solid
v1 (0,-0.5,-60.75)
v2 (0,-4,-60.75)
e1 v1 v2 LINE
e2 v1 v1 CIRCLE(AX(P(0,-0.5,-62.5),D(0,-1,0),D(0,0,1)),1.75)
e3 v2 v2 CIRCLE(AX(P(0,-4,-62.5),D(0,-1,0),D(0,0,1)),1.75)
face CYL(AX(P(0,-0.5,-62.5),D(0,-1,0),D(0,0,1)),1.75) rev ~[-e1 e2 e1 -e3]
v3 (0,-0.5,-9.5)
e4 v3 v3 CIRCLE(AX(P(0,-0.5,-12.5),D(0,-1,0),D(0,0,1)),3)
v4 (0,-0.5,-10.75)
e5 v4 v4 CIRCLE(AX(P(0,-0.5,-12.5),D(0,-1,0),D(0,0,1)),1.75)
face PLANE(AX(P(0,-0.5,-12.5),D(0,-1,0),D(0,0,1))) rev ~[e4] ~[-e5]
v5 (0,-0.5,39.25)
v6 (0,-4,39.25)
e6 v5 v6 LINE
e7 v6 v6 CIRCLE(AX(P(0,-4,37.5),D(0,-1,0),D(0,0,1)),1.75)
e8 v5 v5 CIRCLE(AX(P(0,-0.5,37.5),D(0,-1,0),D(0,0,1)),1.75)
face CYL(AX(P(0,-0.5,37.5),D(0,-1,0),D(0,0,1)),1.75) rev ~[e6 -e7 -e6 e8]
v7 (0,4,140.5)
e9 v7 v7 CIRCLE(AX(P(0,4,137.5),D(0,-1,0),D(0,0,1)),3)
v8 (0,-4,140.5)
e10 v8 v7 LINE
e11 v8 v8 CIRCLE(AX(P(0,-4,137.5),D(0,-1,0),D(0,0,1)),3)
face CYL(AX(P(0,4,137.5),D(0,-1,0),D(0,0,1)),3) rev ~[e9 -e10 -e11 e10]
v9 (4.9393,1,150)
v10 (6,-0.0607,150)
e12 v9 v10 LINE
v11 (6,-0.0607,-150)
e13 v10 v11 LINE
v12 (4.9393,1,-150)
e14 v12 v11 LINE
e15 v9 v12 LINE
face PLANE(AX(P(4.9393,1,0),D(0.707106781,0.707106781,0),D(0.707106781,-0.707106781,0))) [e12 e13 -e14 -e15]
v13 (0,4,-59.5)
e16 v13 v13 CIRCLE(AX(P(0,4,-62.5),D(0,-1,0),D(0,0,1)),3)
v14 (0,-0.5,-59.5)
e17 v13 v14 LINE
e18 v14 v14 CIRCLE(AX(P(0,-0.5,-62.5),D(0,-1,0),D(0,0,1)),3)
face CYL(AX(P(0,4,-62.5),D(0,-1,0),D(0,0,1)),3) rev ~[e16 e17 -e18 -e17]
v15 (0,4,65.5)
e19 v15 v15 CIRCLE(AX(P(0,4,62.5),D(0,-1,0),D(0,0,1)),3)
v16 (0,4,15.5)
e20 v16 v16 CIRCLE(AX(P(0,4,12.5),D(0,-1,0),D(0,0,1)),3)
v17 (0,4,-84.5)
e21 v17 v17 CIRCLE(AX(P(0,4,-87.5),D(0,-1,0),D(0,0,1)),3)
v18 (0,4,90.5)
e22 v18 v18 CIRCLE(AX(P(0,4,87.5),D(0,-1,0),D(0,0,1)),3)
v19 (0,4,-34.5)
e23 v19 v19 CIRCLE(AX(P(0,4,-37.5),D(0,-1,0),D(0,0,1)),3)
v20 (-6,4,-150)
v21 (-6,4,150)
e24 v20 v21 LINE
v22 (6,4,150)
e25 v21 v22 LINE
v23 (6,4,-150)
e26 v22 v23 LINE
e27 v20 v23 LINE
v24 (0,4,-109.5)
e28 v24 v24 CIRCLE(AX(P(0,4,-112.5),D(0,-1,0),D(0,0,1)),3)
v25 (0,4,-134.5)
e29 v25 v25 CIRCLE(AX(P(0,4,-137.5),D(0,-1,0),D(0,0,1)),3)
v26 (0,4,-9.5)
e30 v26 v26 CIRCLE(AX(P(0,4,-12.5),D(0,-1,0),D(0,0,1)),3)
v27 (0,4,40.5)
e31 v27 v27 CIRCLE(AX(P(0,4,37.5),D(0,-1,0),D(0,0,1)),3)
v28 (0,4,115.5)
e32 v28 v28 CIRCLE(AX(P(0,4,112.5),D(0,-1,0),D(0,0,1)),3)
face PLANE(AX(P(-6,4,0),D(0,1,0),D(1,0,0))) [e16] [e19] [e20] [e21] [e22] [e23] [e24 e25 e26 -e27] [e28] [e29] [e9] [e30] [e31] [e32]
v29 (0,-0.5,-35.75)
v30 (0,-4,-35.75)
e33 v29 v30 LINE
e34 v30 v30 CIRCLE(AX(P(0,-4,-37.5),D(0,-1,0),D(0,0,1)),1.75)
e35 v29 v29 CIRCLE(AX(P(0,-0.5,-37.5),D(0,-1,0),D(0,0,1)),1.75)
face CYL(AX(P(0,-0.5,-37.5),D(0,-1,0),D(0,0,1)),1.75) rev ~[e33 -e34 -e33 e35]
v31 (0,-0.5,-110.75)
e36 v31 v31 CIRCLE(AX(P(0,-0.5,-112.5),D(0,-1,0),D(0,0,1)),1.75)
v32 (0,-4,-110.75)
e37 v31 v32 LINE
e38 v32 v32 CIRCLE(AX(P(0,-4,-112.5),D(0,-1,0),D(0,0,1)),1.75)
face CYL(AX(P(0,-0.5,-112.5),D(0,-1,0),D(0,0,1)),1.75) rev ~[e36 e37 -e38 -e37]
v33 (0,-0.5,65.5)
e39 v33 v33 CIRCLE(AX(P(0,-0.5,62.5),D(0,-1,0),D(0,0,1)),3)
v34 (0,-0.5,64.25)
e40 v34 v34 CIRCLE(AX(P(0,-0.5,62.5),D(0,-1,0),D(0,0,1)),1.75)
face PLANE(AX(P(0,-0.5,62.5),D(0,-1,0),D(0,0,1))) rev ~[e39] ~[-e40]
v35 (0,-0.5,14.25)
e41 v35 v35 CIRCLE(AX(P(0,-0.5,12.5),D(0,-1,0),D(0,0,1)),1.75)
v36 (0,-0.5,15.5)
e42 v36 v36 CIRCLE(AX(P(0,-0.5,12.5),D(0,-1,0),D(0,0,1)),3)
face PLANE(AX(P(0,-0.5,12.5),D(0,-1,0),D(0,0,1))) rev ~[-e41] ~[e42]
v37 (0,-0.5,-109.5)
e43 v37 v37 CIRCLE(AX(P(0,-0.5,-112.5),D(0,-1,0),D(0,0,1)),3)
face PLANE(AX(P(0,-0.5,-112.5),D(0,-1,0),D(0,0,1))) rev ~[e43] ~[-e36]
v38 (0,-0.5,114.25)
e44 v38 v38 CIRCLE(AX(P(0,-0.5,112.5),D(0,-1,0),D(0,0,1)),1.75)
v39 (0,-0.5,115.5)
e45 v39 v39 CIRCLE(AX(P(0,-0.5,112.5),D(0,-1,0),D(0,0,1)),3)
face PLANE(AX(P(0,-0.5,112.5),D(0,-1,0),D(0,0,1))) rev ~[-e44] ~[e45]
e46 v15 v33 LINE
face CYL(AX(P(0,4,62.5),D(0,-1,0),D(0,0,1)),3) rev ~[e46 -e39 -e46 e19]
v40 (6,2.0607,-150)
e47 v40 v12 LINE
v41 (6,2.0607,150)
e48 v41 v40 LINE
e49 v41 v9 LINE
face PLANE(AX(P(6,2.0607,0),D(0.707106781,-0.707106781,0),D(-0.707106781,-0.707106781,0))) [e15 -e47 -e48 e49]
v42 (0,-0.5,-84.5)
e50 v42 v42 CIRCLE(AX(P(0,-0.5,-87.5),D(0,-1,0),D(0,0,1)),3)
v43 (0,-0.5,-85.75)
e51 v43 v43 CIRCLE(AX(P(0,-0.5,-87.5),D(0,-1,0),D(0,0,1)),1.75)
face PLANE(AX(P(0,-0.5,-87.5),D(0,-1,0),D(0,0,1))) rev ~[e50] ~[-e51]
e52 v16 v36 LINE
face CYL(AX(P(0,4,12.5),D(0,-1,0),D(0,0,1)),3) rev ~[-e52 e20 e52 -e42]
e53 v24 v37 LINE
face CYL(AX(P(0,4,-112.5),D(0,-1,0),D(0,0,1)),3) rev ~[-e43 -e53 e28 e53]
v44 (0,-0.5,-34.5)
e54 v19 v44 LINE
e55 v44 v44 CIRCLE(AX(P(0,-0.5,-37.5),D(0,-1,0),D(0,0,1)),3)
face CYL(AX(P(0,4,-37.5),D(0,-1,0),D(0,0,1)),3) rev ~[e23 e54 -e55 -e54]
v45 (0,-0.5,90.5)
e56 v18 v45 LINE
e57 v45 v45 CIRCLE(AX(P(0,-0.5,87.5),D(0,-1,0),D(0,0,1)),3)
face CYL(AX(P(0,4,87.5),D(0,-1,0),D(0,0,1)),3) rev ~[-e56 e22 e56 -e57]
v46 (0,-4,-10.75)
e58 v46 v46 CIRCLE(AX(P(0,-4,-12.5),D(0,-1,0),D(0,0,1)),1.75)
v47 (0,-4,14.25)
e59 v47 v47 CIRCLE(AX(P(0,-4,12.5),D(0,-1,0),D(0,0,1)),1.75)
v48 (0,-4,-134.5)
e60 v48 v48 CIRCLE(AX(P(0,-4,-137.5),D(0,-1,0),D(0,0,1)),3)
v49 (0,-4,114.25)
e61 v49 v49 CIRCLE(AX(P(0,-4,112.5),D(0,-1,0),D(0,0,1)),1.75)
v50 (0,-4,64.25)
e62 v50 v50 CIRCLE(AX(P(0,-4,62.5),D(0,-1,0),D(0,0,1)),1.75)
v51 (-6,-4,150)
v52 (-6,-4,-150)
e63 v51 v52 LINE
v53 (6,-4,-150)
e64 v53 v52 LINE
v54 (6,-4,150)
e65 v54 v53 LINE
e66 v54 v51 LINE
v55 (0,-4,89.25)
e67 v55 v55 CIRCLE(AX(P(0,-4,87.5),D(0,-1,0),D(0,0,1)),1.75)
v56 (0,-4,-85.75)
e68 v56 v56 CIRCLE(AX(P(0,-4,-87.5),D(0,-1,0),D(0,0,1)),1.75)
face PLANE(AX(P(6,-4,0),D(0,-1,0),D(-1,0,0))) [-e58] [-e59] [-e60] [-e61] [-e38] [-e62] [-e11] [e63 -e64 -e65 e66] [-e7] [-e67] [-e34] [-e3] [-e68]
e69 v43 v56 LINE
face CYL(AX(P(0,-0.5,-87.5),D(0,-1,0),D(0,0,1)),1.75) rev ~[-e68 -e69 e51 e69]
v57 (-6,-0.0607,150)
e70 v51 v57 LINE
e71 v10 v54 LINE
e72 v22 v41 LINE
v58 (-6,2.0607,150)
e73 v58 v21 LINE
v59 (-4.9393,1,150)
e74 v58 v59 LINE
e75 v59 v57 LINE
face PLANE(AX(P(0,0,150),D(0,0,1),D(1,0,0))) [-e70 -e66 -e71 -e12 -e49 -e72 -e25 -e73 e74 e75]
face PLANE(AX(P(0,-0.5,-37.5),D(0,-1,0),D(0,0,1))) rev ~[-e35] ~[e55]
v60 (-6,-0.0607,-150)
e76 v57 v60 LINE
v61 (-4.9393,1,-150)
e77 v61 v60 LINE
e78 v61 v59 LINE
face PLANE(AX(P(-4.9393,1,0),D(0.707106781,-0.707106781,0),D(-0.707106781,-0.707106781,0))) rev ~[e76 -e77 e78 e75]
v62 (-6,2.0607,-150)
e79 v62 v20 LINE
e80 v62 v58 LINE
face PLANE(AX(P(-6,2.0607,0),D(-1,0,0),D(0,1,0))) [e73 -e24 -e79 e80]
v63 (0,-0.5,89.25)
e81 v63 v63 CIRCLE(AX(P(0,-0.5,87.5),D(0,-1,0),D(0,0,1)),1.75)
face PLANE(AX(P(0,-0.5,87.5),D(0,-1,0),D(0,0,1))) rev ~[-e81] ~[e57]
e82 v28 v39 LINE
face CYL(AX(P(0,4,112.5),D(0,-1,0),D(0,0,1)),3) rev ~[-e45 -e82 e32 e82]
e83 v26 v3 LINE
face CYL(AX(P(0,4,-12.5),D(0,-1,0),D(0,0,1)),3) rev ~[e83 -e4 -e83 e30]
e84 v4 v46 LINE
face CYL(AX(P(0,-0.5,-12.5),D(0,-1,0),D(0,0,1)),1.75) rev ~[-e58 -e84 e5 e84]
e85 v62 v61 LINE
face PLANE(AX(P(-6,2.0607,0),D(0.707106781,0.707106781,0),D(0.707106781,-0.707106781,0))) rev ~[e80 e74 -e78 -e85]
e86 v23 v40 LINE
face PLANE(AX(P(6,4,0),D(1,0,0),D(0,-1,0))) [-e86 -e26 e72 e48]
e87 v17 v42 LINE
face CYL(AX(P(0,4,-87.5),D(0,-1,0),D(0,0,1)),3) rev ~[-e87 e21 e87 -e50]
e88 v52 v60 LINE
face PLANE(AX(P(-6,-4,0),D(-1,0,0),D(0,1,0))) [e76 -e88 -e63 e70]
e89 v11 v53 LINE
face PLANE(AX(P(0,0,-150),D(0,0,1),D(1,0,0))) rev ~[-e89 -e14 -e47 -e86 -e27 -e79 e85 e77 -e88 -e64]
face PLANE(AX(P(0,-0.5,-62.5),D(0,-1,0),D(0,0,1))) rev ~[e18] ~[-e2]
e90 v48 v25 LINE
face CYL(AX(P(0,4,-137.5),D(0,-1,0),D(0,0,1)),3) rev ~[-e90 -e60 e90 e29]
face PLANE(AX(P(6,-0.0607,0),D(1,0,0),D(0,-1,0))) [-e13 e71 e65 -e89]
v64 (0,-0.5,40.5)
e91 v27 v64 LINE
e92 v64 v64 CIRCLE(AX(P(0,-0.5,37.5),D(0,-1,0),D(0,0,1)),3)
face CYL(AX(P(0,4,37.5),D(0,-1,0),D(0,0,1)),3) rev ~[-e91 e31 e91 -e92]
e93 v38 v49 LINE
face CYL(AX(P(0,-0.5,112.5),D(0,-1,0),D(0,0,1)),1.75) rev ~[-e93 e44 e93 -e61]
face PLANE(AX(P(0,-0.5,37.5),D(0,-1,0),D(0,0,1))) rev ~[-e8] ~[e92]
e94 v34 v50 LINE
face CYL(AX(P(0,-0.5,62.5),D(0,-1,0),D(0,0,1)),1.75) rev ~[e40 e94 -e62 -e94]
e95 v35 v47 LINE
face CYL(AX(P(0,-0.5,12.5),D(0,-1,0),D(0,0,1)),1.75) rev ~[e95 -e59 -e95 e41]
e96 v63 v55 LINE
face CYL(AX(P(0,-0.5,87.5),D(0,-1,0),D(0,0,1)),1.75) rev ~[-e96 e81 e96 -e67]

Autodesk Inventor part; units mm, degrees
ref_plane "YZ Plane" through (0, 0, 0) normal (1, 0, 0) x (0, 1, 0)
ref_plane "XZ Plane" through (0, 0, 0) normal (0, 1, 0) x (-1, 0, 0)
ref_plane "XY Plane" through (0, 0, 0) normal (0, 0, 1) x (1, 0, 0)
sketch "Sketch1" plane through (0, 0, 0) normal (0, 0, 1) x (1, 0, 0)
  line L0 (-6, 4) -> (6, 4)
  line L1 (6, 4) -> (6, -4)
  line L2 (6, -4) -> (-6, -4)
  line L3 (-6, -4) -> (-6, 4)
  line L4 (-6, 4) -> (6, -4) construction
  line L5 (6, 4) -> (-6, -4) construction
  line L6 (-6, 2.0607) -> (-4.9393, 1)
  line L7 (-6, 2.0607) -> (-4.5, 2.0607) construction
  line L8 (-4.9393, 1) -> (-6, -0.0607)
  line L9 (0, 4) -> (0, -4) construction
  line L10 (6, 2.0607) -> (4.9393, 1)
  line L11 (4.9393, 1) -> (6, -0.0607)
  point P0 (0, 0)
  point P1 (6, -0.0607)
  point P2 (6, 2.0607)
  dimension "d0" = 12
  dimension "d1" = 8
  dimension "d2" = 45
  dimension "d3" = 3
  dimension "d4" = 1.5
extrude "Extrusion1" add sketch "Sketch1" along normal mid plane 300 contours L0 L1 L10 L11 L2 L3 L8 L6
sketch "Sketch2" plane through (-6, 4, 150) normal (0, 1, 0) x (1, 0, 0)
  point P0 (6, 150)
  point P1 (6, 150)
  point P2 (6, 162.5)
  dimension "d17" = 12.5
hole "Hole1" at (0, 4, -12.5) direction (0, -1, 0) diameter 3.5 end through all counterbore diameter 6 counterbore depth 4.5
pattern_linear "Rectangular Pattern1" count 12 spacing 25 along (0, 0, 1) of "Hole1" first direction both ways yes
sketch "Sketch3" plane through (-6, 4, 150) normal (0, 1, 0) x (1, 0, 0)
  circle A0 centre (6, 12.5) radius 3 projected
  circle A1 centre (6, 287.5) radius 3 projected
  point P0 (6, 150)
hole "Hole2" at (0, 4, 137.5) at (0, 4, -137.5) direction (0, -1, 0) diameter 6 end through all
properties part number "MGN15 Rail" material "Stainless Steel, 440C"
